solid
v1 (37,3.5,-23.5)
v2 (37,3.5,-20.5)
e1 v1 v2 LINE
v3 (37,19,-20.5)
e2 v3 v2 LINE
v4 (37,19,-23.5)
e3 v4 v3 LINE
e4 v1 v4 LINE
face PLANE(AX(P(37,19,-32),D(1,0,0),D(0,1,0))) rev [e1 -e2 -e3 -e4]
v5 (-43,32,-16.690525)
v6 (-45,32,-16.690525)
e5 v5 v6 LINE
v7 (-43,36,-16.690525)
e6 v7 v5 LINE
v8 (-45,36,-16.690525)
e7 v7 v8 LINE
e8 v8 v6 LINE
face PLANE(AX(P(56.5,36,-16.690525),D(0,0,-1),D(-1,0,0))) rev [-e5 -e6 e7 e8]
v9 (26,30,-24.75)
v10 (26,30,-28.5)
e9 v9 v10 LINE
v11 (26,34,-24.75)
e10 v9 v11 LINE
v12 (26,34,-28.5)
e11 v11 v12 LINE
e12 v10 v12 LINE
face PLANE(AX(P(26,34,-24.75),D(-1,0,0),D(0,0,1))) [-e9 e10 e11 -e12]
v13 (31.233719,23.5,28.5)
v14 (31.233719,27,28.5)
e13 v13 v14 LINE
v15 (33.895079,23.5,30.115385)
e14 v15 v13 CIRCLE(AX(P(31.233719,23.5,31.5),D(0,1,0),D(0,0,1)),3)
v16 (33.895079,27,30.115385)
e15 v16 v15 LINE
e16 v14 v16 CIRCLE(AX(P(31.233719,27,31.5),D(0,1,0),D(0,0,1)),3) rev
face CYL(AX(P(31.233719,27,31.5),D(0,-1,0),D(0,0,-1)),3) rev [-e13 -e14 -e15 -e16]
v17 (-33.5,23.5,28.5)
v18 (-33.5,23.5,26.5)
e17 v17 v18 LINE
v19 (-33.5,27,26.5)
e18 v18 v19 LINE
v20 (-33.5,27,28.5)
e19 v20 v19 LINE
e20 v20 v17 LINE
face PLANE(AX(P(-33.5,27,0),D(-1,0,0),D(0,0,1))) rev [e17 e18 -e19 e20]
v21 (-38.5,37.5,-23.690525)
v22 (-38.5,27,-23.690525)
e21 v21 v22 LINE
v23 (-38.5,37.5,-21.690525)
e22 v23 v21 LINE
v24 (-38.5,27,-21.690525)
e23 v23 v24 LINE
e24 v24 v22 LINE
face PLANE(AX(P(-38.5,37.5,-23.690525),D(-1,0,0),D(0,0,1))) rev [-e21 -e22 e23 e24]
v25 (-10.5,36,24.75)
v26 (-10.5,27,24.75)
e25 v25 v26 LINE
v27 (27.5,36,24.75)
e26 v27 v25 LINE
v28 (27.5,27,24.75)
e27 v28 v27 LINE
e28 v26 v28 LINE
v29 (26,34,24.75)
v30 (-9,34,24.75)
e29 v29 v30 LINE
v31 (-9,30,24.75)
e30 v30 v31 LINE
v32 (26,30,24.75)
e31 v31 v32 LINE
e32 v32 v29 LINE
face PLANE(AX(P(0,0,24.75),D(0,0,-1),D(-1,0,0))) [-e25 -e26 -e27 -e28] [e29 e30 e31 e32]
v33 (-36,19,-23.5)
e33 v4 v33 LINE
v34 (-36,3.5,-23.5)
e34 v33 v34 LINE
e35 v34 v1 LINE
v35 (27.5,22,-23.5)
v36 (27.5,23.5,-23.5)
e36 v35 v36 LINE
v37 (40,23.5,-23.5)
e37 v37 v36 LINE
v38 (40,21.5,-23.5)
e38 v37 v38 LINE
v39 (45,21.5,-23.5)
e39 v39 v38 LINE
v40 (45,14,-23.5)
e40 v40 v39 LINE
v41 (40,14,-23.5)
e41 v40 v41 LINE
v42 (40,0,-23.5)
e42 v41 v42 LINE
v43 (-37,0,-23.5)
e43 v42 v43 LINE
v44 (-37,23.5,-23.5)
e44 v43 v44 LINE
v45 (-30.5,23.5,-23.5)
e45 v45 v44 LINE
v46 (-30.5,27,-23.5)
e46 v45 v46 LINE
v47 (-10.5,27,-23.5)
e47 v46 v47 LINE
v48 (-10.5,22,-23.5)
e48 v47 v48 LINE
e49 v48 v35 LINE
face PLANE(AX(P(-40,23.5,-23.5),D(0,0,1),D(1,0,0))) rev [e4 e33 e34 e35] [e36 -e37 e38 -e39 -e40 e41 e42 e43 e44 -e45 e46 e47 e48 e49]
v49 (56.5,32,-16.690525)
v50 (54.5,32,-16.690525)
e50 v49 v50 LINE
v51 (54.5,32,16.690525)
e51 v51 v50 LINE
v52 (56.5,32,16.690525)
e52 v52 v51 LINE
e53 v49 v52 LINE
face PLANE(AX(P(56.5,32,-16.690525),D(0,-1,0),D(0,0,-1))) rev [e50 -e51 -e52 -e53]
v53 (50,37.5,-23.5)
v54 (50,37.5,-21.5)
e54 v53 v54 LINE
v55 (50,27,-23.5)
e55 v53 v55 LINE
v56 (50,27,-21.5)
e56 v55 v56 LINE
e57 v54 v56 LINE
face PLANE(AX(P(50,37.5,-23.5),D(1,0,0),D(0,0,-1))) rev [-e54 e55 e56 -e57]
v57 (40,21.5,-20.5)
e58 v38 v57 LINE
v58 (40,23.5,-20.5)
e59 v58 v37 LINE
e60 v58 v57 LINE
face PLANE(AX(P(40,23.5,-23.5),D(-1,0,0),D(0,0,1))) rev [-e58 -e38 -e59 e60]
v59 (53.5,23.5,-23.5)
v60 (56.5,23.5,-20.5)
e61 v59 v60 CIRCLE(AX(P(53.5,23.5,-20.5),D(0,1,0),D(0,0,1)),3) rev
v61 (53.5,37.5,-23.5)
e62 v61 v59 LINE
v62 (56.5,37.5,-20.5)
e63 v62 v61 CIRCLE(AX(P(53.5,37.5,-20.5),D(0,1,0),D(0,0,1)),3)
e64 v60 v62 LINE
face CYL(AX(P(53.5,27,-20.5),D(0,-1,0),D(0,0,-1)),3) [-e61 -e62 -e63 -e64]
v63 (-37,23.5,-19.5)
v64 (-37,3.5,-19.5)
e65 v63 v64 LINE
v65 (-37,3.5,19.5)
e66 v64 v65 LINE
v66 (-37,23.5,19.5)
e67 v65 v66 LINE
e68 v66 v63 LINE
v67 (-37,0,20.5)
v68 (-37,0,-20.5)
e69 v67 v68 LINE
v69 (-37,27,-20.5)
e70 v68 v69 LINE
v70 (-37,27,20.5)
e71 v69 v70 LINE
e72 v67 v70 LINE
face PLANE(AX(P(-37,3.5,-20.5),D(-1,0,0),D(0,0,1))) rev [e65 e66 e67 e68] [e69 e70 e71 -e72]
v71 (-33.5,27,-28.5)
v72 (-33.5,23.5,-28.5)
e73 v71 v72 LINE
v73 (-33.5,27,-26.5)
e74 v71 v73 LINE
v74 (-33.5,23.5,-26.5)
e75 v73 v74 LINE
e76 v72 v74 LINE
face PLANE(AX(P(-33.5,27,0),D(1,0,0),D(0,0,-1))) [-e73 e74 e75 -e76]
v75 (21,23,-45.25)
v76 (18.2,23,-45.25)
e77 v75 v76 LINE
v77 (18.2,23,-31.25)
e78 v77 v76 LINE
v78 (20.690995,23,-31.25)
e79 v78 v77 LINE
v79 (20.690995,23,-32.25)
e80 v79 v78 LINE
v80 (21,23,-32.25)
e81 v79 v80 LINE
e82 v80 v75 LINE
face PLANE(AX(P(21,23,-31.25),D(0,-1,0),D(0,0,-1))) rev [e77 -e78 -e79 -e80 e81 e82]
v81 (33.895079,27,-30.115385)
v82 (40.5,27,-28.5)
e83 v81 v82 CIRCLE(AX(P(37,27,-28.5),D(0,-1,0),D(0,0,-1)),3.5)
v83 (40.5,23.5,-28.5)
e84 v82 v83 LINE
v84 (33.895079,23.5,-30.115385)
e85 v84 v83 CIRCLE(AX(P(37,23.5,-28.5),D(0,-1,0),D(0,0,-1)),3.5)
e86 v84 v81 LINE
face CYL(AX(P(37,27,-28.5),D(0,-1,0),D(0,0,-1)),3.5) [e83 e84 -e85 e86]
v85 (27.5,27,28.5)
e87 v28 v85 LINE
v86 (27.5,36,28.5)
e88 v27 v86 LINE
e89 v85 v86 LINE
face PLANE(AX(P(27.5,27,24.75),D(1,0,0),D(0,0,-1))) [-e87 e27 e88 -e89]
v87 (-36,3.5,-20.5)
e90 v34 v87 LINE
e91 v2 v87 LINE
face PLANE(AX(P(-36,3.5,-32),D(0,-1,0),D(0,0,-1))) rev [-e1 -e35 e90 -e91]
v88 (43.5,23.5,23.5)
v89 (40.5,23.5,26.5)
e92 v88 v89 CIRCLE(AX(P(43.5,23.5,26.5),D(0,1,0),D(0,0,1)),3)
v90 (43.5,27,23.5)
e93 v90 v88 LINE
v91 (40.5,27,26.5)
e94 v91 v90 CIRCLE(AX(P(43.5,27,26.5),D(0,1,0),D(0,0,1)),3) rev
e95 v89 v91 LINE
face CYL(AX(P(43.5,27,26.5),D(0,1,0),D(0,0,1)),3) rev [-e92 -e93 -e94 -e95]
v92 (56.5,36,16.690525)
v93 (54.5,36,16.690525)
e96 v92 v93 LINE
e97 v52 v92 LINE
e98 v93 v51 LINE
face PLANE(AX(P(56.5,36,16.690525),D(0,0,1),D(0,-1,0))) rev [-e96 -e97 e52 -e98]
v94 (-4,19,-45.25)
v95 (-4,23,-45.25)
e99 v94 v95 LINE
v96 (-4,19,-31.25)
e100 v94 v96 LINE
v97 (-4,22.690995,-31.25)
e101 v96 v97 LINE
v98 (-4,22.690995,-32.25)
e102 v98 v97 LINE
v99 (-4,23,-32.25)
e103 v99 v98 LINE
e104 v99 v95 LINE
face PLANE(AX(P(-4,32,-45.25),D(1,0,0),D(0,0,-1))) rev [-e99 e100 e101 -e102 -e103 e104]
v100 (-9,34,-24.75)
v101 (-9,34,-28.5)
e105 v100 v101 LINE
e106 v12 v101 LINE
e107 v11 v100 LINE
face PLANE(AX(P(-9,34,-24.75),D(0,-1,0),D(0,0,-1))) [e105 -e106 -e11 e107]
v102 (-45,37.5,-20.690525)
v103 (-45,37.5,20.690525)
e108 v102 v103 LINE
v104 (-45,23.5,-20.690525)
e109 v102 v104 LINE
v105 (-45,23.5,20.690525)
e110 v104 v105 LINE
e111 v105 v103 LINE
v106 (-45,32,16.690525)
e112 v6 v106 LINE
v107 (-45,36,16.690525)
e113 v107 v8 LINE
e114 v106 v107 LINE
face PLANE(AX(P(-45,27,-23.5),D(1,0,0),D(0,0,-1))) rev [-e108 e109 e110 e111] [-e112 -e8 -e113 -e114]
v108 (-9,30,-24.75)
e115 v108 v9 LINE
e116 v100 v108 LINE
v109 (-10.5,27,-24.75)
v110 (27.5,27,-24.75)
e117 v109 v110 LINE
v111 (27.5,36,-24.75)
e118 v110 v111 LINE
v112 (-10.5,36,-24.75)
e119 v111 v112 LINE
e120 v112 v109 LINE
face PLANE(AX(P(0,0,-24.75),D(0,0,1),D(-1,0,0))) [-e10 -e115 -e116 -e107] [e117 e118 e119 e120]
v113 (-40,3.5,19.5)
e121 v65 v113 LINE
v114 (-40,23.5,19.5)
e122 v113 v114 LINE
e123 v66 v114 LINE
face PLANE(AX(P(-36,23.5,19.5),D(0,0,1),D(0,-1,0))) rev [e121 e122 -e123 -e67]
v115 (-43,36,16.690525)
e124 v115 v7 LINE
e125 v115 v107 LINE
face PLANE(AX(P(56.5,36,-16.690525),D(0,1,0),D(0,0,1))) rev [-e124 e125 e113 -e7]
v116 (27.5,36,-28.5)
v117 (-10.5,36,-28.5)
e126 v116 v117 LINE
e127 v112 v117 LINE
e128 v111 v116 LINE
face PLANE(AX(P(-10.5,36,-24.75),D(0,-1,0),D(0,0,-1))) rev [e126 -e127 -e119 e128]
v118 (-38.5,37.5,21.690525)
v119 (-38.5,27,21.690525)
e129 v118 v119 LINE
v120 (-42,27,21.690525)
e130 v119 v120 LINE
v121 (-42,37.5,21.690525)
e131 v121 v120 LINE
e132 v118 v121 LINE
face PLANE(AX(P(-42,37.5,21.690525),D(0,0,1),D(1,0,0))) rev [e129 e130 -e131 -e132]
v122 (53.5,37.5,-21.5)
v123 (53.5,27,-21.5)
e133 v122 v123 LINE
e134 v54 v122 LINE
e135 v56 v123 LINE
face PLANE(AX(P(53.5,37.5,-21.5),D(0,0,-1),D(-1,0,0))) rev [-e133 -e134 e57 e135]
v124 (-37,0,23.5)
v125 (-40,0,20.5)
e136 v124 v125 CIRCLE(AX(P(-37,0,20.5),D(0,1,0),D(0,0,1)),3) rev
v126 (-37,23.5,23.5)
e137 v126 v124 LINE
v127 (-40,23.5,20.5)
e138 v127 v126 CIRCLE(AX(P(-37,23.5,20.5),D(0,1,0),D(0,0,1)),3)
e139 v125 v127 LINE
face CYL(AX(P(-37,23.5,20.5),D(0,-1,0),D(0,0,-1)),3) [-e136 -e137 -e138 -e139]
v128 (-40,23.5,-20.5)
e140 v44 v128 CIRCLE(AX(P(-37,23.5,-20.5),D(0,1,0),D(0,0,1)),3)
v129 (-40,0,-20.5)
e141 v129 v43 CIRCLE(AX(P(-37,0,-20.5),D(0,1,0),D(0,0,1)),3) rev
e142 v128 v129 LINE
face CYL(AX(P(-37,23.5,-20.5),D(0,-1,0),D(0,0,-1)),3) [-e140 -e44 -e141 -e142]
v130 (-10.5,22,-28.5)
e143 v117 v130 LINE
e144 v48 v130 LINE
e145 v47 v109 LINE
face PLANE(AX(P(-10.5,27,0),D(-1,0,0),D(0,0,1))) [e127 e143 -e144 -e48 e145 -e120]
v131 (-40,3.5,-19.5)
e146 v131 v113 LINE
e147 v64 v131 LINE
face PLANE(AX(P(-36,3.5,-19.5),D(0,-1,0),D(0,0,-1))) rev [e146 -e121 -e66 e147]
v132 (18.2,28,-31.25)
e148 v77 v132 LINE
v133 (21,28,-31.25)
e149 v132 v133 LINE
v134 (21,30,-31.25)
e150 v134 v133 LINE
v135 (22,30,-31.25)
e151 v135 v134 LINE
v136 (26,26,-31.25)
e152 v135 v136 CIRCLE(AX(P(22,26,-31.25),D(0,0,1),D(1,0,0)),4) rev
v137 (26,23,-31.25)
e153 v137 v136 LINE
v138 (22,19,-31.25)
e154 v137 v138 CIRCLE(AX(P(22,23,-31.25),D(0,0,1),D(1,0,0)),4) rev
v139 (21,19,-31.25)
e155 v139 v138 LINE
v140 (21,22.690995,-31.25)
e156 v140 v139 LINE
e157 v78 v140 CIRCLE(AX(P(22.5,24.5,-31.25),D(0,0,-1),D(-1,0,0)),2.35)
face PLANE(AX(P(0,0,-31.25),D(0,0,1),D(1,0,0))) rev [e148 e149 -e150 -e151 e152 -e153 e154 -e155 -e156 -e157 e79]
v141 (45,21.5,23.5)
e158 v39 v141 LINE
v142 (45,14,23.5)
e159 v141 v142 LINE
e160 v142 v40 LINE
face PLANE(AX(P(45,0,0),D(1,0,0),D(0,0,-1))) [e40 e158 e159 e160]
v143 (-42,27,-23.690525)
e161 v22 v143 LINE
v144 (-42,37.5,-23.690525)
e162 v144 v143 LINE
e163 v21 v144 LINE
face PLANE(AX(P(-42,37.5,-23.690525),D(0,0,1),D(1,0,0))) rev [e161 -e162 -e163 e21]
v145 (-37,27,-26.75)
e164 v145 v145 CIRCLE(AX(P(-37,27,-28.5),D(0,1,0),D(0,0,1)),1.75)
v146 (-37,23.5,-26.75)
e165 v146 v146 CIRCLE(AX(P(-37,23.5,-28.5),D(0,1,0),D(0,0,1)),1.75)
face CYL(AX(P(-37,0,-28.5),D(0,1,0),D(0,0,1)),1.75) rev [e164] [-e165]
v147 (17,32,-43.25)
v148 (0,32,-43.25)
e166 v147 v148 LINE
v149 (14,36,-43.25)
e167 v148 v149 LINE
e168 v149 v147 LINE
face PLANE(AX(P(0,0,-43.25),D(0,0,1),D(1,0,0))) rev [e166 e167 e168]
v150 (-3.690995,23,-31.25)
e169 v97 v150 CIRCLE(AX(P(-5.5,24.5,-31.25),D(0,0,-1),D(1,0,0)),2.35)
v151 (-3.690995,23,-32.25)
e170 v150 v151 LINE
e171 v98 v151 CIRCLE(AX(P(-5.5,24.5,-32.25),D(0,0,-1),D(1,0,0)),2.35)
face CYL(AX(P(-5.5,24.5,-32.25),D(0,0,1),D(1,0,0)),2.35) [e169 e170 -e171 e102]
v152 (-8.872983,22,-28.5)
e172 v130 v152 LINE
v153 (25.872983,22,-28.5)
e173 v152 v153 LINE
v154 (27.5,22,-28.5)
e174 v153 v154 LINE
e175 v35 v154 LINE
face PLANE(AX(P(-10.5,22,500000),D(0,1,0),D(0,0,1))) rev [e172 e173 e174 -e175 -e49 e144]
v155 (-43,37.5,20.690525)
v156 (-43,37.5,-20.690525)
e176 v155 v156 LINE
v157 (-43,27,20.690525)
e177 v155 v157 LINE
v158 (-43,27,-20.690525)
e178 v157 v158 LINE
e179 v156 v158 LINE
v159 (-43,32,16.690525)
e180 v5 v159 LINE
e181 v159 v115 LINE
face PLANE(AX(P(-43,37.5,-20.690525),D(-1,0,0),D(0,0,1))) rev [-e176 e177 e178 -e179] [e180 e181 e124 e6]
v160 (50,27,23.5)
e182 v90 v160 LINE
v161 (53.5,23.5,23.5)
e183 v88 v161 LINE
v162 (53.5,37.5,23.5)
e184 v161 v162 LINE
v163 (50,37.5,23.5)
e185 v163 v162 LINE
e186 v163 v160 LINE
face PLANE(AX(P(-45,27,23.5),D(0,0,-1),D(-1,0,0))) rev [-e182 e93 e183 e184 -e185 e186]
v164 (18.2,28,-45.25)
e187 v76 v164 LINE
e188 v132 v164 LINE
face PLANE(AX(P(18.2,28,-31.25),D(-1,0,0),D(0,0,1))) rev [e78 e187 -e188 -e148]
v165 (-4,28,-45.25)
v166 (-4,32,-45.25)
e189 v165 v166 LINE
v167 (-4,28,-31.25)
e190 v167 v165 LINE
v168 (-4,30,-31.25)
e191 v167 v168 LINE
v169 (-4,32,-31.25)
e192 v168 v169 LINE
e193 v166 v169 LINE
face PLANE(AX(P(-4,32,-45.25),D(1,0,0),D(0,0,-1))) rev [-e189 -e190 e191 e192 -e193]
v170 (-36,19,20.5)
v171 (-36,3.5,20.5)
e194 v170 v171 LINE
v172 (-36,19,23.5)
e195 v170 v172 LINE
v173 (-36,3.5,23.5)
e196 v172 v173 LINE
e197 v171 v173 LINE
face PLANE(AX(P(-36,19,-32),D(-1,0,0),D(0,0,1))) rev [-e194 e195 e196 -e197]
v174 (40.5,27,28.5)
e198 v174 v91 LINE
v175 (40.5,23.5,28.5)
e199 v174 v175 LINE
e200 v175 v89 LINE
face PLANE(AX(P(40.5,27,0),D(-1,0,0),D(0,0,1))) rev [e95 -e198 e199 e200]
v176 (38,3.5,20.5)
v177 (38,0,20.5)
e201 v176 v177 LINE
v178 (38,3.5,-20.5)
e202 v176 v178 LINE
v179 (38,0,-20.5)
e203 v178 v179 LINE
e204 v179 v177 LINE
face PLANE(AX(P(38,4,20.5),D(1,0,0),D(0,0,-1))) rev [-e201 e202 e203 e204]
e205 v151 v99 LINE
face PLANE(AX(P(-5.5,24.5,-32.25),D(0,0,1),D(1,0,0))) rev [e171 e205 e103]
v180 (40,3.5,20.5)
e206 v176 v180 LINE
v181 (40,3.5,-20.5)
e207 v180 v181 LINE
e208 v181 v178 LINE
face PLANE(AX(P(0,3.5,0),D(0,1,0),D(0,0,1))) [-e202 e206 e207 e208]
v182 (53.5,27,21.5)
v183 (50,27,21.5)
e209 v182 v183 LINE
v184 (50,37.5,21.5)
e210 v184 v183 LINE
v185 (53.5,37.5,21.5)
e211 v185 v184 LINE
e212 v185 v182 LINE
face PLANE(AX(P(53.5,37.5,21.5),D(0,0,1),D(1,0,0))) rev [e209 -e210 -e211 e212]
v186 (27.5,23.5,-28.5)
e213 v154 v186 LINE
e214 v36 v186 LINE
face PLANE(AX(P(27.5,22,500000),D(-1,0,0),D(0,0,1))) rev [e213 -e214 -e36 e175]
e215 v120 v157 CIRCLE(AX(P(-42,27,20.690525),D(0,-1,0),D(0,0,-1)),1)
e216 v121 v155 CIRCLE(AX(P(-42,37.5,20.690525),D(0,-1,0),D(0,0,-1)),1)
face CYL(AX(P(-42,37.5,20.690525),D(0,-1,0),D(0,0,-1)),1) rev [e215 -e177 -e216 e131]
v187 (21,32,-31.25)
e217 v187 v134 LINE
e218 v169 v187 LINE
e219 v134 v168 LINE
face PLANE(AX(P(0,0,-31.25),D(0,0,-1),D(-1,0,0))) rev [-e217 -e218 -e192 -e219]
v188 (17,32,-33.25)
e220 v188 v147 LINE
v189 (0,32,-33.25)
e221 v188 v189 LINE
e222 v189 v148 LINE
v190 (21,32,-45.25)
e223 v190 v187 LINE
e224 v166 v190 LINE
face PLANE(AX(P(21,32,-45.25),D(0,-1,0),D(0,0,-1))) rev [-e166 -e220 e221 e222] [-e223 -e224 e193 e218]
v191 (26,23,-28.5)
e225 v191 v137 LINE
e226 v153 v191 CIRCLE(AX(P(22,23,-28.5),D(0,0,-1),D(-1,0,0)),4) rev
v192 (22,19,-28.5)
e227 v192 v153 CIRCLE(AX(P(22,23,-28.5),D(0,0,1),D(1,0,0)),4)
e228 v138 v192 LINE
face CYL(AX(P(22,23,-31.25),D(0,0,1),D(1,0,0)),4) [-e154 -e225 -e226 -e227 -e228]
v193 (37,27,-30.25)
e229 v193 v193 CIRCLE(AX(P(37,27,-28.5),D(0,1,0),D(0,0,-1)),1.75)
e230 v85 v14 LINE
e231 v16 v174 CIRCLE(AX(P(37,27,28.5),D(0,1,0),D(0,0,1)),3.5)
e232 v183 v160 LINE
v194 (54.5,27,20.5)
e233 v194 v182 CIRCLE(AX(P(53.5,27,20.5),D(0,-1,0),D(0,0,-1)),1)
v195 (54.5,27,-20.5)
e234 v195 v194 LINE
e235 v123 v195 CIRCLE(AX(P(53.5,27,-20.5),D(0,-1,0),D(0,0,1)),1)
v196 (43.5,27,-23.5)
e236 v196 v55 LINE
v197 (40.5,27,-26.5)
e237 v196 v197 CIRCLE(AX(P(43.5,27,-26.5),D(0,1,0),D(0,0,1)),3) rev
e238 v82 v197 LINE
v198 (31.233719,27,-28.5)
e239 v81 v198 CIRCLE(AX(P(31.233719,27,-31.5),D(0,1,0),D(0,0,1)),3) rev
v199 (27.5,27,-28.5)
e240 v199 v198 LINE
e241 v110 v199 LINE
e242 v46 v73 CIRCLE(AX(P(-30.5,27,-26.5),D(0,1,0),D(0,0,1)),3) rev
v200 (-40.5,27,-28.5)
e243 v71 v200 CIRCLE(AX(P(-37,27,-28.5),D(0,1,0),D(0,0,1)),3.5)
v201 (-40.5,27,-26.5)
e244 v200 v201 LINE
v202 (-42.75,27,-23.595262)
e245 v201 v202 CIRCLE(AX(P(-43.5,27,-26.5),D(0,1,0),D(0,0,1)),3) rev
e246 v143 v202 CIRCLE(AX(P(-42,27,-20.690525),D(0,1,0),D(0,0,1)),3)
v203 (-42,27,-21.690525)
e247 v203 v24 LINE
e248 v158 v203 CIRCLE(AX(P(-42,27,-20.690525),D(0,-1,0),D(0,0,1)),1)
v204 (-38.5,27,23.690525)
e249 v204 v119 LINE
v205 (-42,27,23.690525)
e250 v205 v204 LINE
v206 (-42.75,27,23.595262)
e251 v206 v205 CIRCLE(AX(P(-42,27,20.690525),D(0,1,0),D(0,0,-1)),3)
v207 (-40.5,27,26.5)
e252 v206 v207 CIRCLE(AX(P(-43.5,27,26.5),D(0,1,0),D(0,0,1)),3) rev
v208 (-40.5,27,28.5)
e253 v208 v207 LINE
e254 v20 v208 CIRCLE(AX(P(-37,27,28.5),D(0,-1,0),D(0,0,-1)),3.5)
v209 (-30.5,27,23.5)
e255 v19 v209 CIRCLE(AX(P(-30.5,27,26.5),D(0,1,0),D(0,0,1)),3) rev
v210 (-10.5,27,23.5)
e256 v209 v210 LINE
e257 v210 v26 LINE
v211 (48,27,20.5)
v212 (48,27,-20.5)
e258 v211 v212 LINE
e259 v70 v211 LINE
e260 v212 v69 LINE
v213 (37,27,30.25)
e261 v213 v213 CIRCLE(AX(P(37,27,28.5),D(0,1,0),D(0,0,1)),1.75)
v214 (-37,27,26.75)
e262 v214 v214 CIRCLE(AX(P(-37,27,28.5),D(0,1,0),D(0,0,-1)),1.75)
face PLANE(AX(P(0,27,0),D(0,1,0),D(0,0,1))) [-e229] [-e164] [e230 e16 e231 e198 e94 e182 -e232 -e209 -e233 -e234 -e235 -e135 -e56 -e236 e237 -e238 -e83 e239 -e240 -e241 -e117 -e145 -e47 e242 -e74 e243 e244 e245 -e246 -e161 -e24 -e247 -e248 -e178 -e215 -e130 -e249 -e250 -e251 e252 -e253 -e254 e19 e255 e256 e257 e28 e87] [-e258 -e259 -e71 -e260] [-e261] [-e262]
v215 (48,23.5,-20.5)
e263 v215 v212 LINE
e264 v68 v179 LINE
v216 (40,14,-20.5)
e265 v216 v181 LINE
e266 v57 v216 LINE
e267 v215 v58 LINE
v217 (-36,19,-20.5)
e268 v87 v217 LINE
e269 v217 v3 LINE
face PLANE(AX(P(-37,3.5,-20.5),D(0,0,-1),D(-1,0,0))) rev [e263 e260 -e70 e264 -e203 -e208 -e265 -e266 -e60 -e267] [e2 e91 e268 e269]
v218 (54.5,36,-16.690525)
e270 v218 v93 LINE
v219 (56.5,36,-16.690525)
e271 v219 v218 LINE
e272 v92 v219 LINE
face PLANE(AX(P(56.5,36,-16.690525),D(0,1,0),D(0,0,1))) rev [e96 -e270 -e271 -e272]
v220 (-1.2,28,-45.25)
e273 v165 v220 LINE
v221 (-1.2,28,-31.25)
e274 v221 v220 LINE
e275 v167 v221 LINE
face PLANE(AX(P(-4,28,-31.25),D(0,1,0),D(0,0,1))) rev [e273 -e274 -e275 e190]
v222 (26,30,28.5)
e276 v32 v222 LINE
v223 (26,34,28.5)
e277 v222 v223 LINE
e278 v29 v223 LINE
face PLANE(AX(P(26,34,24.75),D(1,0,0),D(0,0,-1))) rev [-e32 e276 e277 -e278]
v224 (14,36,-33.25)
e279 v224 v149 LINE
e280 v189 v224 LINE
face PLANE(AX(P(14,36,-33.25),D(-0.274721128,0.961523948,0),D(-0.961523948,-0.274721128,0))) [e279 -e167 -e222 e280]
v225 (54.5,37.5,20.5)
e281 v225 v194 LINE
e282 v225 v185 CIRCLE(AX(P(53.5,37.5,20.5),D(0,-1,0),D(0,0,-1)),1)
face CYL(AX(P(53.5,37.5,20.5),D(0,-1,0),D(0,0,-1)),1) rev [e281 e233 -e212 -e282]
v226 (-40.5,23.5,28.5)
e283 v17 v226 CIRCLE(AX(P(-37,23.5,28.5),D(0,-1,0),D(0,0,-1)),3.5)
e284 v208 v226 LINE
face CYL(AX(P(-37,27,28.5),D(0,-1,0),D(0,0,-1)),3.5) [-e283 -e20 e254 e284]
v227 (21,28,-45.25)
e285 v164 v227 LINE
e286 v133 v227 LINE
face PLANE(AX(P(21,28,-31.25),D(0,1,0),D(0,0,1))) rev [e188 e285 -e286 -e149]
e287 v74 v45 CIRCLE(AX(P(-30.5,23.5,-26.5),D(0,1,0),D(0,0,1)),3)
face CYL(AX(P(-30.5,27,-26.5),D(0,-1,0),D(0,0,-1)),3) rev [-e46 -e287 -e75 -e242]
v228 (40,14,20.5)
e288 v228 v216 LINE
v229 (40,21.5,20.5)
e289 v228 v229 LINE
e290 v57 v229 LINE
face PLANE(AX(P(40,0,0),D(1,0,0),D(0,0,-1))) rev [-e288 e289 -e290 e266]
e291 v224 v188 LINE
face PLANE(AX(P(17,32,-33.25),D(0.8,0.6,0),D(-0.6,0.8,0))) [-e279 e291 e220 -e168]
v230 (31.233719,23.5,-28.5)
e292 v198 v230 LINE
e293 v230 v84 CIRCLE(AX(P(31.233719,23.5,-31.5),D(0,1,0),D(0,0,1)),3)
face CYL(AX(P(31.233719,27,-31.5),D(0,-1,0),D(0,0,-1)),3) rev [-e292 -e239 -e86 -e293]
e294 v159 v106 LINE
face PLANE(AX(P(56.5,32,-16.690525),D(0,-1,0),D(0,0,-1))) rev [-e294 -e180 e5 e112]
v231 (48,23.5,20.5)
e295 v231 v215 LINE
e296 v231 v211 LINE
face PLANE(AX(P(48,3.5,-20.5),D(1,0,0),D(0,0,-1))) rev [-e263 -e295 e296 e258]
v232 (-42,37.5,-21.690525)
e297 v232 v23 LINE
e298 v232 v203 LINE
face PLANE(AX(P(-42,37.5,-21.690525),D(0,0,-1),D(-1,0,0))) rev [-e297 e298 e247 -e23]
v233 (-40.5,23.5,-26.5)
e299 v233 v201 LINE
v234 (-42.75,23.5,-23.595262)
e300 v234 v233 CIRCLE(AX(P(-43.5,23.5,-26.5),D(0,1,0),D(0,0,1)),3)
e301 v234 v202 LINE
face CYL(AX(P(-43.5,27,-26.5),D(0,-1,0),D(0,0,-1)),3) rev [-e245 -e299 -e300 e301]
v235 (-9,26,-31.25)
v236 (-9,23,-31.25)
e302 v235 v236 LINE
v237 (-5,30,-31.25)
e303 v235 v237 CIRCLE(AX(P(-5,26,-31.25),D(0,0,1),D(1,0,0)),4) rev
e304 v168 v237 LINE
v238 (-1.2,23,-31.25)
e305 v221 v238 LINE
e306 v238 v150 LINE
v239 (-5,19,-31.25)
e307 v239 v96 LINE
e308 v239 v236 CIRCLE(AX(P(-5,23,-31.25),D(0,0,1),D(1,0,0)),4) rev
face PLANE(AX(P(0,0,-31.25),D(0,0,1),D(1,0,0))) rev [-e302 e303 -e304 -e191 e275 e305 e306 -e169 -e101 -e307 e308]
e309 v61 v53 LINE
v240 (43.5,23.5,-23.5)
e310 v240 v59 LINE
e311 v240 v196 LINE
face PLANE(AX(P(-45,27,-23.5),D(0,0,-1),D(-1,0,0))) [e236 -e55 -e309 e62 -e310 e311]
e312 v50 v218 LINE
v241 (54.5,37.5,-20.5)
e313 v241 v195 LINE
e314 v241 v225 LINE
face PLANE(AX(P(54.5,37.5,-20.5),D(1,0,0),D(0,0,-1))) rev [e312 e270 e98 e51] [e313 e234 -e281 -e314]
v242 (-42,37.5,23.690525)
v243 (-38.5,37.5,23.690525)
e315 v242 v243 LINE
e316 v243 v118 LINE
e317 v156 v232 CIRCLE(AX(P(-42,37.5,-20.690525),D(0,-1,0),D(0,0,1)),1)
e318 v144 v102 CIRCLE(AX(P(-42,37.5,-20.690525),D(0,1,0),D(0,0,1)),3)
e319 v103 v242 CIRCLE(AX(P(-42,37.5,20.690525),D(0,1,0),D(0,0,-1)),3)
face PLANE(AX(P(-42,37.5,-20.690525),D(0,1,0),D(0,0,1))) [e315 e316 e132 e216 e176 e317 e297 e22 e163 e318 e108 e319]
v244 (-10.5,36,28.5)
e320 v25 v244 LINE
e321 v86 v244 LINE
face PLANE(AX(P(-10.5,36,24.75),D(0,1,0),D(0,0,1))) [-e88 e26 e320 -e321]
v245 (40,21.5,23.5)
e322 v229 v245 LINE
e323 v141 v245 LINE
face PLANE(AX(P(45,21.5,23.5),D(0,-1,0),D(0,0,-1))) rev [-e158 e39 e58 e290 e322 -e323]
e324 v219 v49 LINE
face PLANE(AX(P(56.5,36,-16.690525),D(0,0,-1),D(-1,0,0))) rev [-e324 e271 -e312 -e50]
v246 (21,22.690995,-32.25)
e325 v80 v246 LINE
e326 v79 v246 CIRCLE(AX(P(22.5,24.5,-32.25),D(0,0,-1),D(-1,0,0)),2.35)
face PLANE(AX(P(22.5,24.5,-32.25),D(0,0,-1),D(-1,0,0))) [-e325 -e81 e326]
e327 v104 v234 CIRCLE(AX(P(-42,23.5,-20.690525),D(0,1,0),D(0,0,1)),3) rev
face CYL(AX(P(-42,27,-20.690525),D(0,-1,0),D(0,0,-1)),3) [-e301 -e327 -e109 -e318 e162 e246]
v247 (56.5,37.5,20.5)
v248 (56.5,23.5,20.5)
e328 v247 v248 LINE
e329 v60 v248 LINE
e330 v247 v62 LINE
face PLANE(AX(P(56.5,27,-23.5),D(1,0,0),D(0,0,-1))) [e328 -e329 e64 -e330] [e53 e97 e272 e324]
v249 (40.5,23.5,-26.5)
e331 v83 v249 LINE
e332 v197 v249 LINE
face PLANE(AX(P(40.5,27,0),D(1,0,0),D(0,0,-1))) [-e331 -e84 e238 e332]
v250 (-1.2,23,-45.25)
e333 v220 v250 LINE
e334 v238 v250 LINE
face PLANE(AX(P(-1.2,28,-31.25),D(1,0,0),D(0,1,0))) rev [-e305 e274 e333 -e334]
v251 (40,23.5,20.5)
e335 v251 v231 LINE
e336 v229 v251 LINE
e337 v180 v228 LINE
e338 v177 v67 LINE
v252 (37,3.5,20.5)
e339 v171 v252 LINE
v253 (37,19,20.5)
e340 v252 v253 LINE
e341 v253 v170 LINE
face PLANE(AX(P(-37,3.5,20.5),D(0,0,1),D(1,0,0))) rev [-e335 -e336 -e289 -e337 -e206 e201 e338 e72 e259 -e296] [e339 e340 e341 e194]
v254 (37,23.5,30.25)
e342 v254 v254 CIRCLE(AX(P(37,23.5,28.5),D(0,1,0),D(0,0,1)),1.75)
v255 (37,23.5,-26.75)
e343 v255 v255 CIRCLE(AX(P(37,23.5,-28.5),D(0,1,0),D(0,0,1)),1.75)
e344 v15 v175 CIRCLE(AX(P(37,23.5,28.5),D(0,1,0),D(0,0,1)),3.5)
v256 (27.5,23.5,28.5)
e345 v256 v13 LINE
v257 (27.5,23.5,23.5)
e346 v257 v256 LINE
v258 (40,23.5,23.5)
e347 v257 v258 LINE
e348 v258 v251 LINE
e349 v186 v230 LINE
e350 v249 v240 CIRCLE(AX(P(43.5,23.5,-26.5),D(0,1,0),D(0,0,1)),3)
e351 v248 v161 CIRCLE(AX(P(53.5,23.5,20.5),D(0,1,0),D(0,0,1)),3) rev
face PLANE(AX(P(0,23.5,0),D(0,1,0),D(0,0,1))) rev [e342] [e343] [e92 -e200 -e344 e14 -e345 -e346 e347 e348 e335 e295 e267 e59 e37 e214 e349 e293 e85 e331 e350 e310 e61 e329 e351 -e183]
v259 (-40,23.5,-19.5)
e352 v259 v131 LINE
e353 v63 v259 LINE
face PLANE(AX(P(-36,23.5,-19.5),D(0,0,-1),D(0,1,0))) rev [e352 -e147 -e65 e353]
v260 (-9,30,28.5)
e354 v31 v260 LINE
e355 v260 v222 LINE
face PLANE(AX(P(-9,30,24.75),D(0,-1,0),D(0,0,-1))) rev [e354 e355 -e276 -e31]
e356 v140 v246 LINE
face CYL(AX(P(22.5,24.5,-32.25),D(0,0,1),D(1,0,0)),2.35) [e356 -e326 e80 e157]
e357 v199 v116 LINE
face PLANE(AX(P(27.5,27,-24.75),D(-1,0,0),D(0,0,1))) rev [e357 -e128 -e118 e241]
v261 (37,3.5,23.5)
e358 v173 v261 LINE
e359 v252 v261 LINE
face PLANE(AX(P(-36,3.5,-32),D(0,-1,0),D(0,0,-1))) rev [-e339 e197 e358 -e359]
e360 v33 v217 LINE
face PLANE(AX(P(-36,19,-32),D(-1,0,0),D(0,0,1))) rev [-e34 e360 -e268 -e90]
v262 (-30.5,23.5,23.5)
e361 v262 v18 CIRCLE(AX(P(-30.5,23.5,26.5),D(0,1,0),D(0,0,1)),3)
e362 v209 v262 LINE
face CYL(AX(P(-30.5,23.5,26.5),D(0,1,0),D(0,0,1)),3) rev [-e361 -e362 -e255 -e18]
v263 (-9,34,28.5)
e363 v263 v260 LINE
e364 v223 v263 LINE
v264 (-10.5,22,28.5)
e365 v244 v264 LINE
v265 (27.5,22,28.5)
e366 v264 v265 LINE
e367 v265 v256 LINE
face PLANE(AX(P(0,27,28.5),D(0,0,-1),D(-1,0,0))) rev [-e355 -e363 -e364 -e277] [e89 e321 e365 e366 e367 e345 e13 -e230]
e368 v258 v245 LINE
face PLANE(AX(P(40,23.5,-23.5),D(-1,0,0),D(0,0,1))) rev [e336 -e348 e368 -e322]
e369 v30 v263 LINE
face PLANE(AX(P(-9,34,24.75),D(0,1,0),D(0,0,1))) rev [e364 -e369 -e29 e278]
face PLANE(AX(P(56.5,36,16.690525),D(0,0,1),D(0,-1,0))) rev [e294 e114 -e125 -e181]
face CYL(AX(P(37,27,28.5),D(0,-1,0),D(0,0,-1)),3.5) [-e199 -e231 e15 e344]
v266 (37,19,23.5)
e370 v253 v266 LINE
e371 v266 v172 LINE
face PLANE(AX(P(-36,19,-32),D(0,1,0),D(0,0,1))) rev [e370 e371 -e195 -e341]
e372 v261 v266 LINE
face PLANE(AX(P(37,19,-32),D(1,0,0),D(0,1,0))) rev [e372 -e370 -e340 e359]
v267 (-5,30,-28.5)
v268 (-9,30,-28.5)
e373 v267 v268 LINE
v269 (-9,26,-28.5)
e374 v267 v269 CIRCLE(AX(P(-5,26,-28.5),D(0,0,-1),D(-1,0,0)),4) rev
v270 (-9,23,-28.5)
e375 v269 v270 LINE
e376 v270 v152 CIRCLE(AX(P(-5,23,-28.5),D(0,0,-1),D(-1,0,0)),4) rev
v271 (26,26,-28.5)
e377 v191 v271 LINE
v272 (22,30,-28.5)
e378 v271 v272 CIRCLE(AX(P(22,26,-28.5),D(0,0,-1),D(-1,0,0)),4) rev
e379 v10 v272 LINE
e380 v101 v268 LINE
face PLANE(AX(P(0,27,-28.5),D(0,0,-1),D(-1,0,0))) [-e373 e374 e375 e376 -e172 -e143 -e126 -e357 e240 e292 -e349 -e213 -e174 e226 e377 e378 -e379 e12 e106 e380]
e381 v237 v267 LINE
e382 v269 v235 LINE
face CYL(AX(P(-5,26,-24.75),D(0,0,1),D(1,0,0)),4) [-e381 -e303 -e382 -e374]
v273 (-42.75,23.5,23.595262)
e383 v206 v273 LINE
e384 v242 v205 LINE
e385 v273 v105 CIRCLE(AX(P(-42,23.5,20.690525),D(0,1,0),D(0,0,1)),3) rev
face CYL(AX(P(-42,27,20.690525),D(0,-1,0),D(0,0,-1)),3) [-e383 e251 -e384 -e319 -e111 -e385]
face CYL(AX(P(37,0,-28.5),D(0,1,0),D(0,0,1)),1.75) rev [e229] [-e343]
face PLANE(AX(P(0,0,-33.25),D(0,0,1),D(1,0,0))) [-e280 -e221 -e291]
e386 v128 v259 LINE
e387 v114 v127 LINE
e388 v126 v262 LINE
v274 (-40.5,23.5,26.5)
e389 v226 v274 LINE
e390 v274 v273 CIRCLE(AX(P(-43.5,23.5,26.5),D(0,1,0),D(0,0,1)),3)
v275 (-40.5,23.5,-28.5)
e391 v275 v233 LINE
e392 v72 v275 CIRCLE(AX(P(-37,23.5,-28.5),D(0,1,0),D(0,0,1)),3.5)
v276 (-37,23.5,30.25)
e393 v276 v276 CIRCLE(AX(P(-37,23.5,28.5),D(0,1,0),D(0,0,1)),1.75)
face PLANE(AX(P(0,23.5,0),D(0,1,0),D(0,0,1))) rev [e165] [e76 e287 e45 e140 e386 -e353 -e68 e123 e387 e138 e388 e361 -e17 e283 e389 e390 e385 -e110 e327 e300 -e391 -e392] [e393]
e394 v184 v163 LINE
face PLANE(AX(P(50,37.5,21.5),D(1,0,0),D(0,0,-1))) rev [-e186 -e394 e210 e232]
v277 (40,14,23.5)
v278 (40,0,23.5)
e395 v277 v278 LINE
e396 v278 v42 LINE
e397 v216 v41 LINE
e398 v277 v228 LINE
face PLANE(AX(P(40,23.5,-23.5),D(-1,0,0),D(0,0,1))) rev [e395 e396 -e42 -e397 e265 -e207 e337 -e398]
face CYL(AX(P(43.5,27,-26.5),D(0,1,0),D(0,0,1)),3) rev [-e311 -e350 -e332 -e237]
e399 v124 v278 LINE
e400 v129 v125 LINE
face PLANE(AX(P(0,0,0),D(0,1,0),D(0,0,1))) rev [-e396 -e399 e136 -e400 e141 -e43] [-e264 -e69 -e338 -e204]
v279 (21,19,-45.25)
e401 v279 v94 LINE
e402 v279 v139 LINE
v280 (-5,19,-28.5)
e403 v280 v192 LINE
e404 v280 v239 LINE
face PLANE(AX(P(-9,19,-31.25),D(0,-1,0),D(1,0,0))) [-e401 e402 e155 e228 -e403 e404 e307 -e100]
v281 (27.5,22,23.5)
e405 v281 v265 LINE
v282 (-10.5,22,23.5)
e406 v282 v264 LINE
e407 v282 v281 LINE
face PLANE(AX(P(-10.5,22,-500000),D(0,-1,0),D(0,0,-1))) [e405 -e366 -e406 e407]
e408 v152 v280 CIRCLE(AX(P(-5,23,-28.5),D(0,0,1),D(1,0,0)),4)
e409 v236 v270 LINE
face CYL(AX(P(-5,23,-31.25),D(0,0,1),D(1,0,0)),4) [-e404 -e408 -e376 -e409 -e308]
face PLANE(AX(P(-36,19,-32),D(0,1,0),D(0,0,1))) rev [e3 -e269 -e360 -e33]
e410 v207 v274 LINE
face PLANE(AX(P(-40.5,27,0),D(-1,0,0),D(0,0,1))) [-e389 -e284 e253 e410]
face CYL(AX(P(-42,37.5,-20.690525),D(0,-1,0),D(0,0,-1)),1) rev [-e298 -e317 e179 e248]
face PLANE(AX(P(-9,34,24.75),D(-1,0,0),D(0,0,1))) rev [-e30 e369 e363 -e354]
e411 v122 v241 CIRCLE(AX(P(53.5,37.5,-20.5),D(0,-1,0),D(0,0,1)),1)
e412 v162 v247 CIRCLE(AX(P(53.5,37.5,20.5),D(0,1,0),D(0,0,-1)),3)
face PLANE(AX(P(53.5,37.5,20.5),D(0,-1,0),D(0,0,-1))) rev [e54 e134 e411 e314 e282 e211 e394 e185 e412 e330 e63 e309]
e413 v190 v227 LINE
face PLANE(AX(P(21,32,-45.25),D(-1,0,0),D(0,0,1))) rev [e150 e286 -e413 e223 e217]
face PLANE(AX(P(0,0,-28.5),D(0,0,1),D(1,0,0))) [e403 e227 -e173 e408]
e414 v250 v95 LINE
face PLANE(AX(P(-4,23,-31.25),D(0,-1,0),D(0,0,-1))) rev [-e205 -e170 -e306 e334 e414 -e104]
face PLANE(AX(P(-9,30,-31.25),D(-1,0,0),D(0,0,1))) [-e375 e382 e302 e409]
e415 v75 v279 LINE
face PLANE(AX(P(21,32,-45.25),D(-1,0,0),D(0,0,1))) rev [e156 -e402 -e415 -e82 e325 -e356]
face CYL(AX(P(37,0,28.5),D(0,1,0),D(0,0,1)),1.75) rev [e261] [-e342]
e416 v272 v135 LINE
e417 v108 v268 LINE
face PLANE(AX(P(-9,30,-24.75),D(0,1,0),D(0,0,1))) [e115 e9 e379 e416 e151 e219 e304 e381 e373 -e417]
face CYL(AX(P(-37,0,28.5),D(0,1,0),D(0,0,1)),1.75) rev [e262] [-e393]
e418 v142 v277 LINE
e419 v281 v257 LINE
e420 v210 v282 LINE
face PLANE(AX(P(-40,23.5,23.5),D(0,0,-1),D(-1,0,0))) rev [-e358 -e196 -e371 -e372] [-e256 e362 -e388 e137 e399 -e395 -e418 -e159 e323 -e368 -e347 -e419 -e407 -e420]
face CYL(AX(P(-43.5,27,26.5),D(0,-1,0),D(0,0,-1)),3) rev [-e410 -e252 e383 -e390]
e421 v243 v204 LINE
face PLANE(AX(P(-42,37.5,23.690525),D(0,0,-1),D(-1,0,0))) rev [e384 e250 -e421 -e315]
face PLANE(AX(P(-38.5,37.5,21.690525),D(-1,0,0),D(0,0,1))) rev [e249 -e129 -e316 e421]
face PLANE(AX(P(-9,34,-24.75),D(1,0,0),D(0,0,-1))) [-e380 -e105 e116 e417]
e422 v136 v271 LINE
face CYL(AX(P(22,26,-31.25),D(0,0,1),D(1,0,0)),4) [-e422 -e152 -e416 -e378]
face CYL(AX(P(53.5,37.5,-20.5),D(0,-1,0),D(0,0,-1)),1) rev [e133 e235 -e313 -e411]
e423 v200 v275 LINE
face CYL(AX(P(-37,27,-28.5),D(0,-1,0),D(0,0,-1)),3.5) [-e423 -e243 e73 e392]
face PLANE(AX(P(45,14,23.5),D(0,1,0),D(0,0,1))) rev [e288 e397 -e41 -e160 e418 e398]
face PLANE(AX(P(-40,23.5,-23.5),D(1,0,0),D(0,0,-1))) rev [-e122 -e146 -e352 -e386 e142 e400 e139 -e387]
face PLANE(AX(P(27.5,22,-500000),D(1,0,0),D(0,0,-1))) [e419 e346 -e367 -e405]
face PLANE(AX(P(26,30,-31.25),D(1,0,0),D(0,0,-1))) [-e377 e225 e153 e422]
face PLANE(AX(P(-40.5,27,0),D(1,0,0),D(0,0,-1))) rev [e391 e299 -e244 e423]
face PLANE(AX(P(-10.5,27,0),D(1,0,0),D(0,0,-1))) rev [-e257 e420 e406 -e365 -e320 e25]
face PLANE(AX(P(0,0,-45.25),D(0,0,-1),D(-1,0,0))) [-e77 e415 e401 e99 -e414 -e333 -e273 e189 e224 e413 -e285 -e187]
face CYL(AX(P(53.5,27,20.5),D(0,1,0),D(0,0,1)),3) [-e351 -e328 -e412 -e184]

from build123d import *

# Parameters (mm, degrees)
SKETCH_1_W          = 80
SKETCH_1_H          = 47
EXTRUDE_1_DEPTH     = 23.5
EXTRUDE_2_DEPTH     = 3.5
SKETCH_19_R         = 1.75
CUT_EXTRUDE_7_DEPTH = 71.322471515
FILLET_2_R          = 3
SKETCH_3_W          = 85
SKETCH_3_H          = 41
CUT_EXTRUDE_1_DEPTH = 23.5
SKETCH_4_W          = 75
SKETCH_4_H          = 41
CUT_EXTRUDE_2_DEPTH = 4
SKETCH_5_W          = 73
SKETCH_5_H          = 15.5
CUT_EXTRUDE_3_DEPTH = 84.674966388
SKETCH_6_W          = 39
SKETCH_6_H          = 20
CUT_EXTRUDE_4_DEPTH = 4
EXTRUDE_3_REACH     = 89.072
SKETCH_9_W          = 38
SKETCH_9_H          = 5
SKETCH_10_W         = 38
SKETCH_10_H         = 9
EXTRUDE_4_DEPTH     = 3.75
SKETCH_11_W         = 35
SKETCH_11_H         = 4
CUT_EXTRUDE_5_DEPTH = 3.75
FILLET_3_R          = 3
FILLET_4_R          = 3
EXTRUDE_START       = 10.5
EXTRUDE_5_DEPTH     = 10.5
SKETCH_13_W         = 33.381049962
SKETCH_13_H         = 4
CUT_EXTRUDE_6_DEPTH = 113.838380057
SKETCH_14_W         = 47
SKETCH_14_H         = 7.5
EXTRUDE_6_DEPTH     = 5
SKETCH_15_W         = 35
SKETCH_15_H         = 11
EXTRUDE_7_DEPTH     = 2.75
SKETCH_16_W         = 25
SKETCH_16_H         = 13
EXTRUDE_8_DEPTH     = 14
SKETCH_21_W         = 2.8
SKETCH_21_H         = 5
CUT_EXTRUDE_8_DEPTH = 14
SKETCH_20_R         = 2.35
EXTRUDE_10_DEPTH    = 1
FILLET_5_R          = 4
EXTRUDE_START_2     = -2
EXTRUDE_9_DEPTH     = 10


with BuildPart() as part:
    # 草图1 → 凸台-拉伸1 (new body)
    with BuildSketch(Plane(origin=(0, 0, 0), x_dir=(1, 0, 0), z_dir=(0, 1, 0))):
        Rectangle(SKETCH_1_W, SKETCH_1_H)
    extrude(amount=EXTRUDE_1_DEPTH)

    # 草图2 → 凸台-拉伸2 (add)
    with BuildSketch(Plane(origin=(0, 23.5, 0), x_dir=(1, 0, 0), z_dir=(0, 1, 0))):
        with BuildLine():
            Line((-10.5, -28.5), (33.5, -28.5))
            ThreePointArc((33.5, -28.5), (37, -32), (40.5, -28.5))
            Line((40.5, -28.5), (40.5, -23.5))
            Line((40.5, -23.5), (56.5, -23.5))
            Line((56.5, -23.5), (56.5, 23.5))
            Line((56.5, 23.5), (40.5, 23.5))
            Line((40.5, 23.5), (40.5, 28.5))
            ThreePointArc((40.5, 28.5), (37, 32), (33.5, 28.5))
            Line((33.5, 28.5), (-10.5, 28.5))
            Line((-10.5, 28.5), (-10.5, 23.5))
            Line((-10.5, 23.5), (-33.5, 23.5))
            Line((-33.5, 23.5), (-33.5, 28.5))
            ThreePointArc((-33.5, 28.5), (-37, 32), (-40.5, 28.5))
            Line((-40.5, 28.5), (-40.5, 23.5))
            Line((-40.5, 23.5), (-45, 23.5))
            Line((-45, 23.5), (-45, -23.5))
            Line((-45, -23.5), (-40.5, -23.5))
            Line((-40.5, -23.5), (-40.5, -28.5))
            ThreePointArc((-40.5, -28.5), (-37, -32), (-33.5, -28.5))
            Line((-33.5, -28.5), (-33.5, -23.5))
            Line((-33.5, -23.5), (-10.5, -23.5))
            Line((-10.5, -23.5), (-10.5, -28.5))
        make_face()
    extrude(amount=EXTRUDE_2_DEPTH)

    # 草图19 → 切除-拉伸7 (cut, through all)
    with BuildSketch(Plane(origin=(0, 27, 0), x_dir=(1, 0, 0), z_dir=(0, 1, 0))):
        with Locations(Location((-37, 28.5, 0), (0, 0, 270))):
            Circle(SKETCH_19_R)
        with Locations(Location((37, 28.5, 0), (0, 0, 270))):
            Circle(SKETCH_19_R)
        with Locations(Location((37, -28.5, 0), (0, 0, 270))):
            Circle(SKETCH_19_R)
        with Locations(Location((-37, -28.5, 0), (0, 0, 270))):
            Circle(SKETCH_19_R)
    extrude(amount=-CUT_EXTRUDE_7_DEPTH, mode=Mode.SUBTRACT)

    # 圆角2
    fillet_2_edges = [part.edges().sort_by_distance(p)[0] for p in [
        (-40, 11.75, -23.5),
        (-40, 11.75, 23.5),
    ]]
    fillet(fillet_2_edges, radius=FILLET_2_R)

    # 草图3 → 切除-拉伸1 (cut)
    with BuildSketch(Plane(origin=(0, 27, 0), x_dir=(1, 0, 0), z_dir=(0, 1, 0))):
        with Locations((5.5, 0)):
            Rectangle(SKETCH_3_W, SKETCH_3_H)
    extrude(amount=-CUT_EXTRUDE_1_DEPTH, mode=Mode.SUBTRACT)

    # 草图4 → 切除-拉伸2 (cut)
    with BuildSketch(Plane.XZ):
        with Locations((0.5, 0)):
            Rectangle(SKETCH_4_W, SKETCH_4_H)
    extrude(amount=-CUT_EXTRUDE_2_DEPTH, mode=Mode.SUBTRACT)

    # 草图5 → 切除-拉伸3 (cut, through all)
    with BuildSketch(Plane.XY.offset(23.5)):
        with Locations((0.5, 11.25)):
            Rectangle(SKETCH_5_W, SKETCH_5_H)
    extrude(amount=-CUT_EXTRUDE_3_DEPTH, mode=Mode.SUBTRACT)

    # 草图6 → 切除-拉伸4 (cut)
    with BuildSketch(Plane.ZY.offset(40)):
        with Locations((0, 13.5)):
            Rectangle(SKETCH_6_W, SKETCH_6_H)
    extrude(amount=-CUT_EXTRUDE_4_DEPTH, mode=Mode.SUBTRACT)

    # 草图9 → 凸台-拉伸3 (add, up to next)
    with BuildSketch(Plane.XY.offset(28.5), mode=Mode.PRIVATE) as extrude_3_sk1:
        with Locations((8.5, 24.5)):
            Rectangle(SKETCH_9_W, SKETCH_9_H)
    extrude_3_tool1 = extrude(extrude_3_sk1.sketch, amount=-EXTRUDE_3_REACH, mode=Mode.PRIVATE) - part.part
    extrude_3 = extrude_3_tool1.solids().sort_by_distance((8.5, 24.5, 28.5))[0]
    add(extrude_3)

    # 草图10 → 凸台-拉伸4 (add)
    with BuildSketch(Plane.XY.offset(28.5)):
        with Locations((8.5, 31.5)):
            Rectangle(SKETCH_10_W, SKETCH_10_H)
    extrude_4 = extrude(amount=-EXTRUDE_4_DEPTH)

    # 草图11 → 切除-拉伸5 (cut)
    with BuildSketch(Plane.XY.offset(28.5)):
        with Locations((8.5, 32)):
            Rectangle(SKETCH_11_W, SKETCH_11_H)
    cut_extrude_5 = extrude(amount=-CUT_EXTRUDE_5_DEPTH, mode=Mode.SUBTRACT)

    # 镜向1: 凸台-拉伸3, 凸台-拉伸4, 切除-拉伸5 across plane
    add(extrude_3.mirror(Plane.XY))
    add(extrude_4.mirror(Plane.XY))
    add(cut_extrude_5.mirror(Plane.XY), mode=Mode.SUBTRACT)

    # 圆角3
    fillet_3_edges = [part.edges().sort_by_distance(p)[0] for p in [
        (33.5, 25.25, 28.5),
        (-40.5, 25.25, 23.5),
        (40.5, 25.25, -23.5),
        (33.5, 25.25, -28.5),
        (-33.5, 25.25, -23.5),
        (-33.5, 25.25, 23.5),
        (40.5, 25.25, 23.5),
        (-40.5, 25.25, -23.5),
    ]]
    fillet(fillet_3_edges, radius=FILLET_3_R)

    # 圆角4
    fillet_4_edges = [part.edges().sort_by_distance(p)[0] for p in [
        (56.5, 25.25, 23.5),
        (56.5, 25.25, -23.5),
        (-45, 25.25, -23.5),
        (-45, 25.25, 23.5),
    ]]
    fillet(fillet_4_edges, radius=FILLET_4_R)

    # 草图12 → 凸台-拉伸5 (add)
    with BuildSketch(Plane(origin=(0, 27, 0), x_dir=(1, 0, 0), z_dir=(0, 1, 0)).offset(EXTRUDE_START)):
        with BuildLine():
            Line((-45, 20.690524981), (-45, -20.690524981))
            ThreePointArc((-45, -20.690524981), (-44.121320344, -22.811845324), (-42, -23.690524981))
            Line((-42, -23.690524981), (-38.5, -23.690524981))
            Line((-38.5, -23.690524981), (-38.5, -21.690524981))
            Line((-38.5, -21.690524981), (-42, -21.690524981))
            ThreePointArc((-42, -21.690524981), (-42.707106781, -21.397631762), (-43, -20.690524981))
            Line((-43, -20.690524981), (-43, 20.690524981))
            ThreePointArc((-43, 20.690524981), (-42.707106781, 21.397631762), (-42, 21.690524981))
            Line((-42, 21.690524981), (-38.5, 21.690524981))
            Line((-38.5, 21.690524981), (-38.5, 23.690524981))
            Line((-38.5, 23.690524981), (-42, 23.690524981))
            ThreePointArc((-42, 23.690524981), (-44.121320344, 22.811845324), (-45, 20.690524981))
        make_face()
        with BuildLine():
            Line((53.5, 23.5), (50, 23.5))
            Line((50, 23.5), (50, 21.5))
            Line((50, 21.5), (53.5, 21.5))
            ThreePointArc((53.5, 21.5), (54.207106781, 21.207106781), (54.5, 20.5))
            Line((54.5, 20.5), (54.5, -20.5))
            ThreePointArc((54.5, -20.5), (54.207106781, -21.207106781), (53.5, -21.5))
            Line((53.5, -21.5), (50, -21.5))
            Line((50, -21.5), (50, -23.5))
            Line((50, -23.5), (53.5, -23.5))
            ThreePointArc((53.5, -23.5), (55.621320344, -22.621320344), (56.5, -20.5))
            Line((56.5, -20.5), (56.5, 20.5))
            ThreePointArc((56.5, 20.5), (55.621320344, 22.621320344), (53.5, 23.5))
        make_face()
    extrude(amount=-EXTRUDE_5_DEPTH)

    # 草图13 → 切除-拉伸6 (cut, through all)
    with BuildSketch(Plane.ZY.offset(45)):
        with Locations((0, 34)):
            Rectangle(SKETCH_13_W, SKETCH_13_H)
    extrude(amount=-CUT_EXTRUDE_6_DEPTH, mode=Mode.SUBTRACT)

    # 草图14 → 凸台-拉伸6 (add)
    with BuildSketch(Plane(origin=(40, 0, 0), x_dir=(0, 0, -1), z_dir=(1, 0, 0))):
        with Locations((0, 17.75)):
            Rectangle(SKETCH_14_W, SKETCH_14_H)
    extrude(amount=EXTRUDE_6_DEPTH)

    # 草图15 → 凸台-拉伸7 (add)
    with BuildSketch(Plane.XY.offset(-28.5)):
        with Locations((8.5, 24.5)):
            Rectangle(SKETCH_15_W, SKETCH_15_H)
    extrude(amount=-EXTRUDE_7_DEPTH)

    # 草图16 → 凸台-拉伸8 (add)
    with BuildSketch(Plane(origin=(0, 0, -31.25), x_dir=(-1, 0, 0), z_dir=(0, 0, -1))):
        with Locations((-8.5, 25.5)):
            Rectangle(SKETCH_16_W, SKETCH_16_H)
    extrude(amount=EXTRUDE_8_DEPTH)

    # 草图21 → 切除-拉伸8 (cut)
    with BuildSketch(Plane(origin=(0, 0, -45.25), x_dir=(-1, 0, 0), z_dir=(0, 0, -1))):
        with Locations((-19.6, 25.5)):
            Rectangle(SKETCH_21_W, SKETCH_21_H)
        with Locations((2.6, 25.5)):
            Rectangle(SKETCH_21_W, SKETCH_21_H)
    extrude(amount=-CUT_EXTRUDE_8_DEPTH, mode=Mode.SUBTRACT)

    # 草图20 → 凸台-拉伸10 (add)
    with BuildSketch(Plane(origin=(0, 0, -31.25), x_dir=(-1, 0, 0), z_dir=(0, 0, -1))):
        with Locations((-22.5, 24.5)):
            Circle(SKETCH_20_R)
        with Locations((5.5, 24.5)):
            Circle(SKETCH_20_R)
    extrude(amount=EXTRUDE_10_DEPTH)

    # 圆角5
    # the kernel refuses this fillet: 4 mm, written as the material it takes off along each edge
    with BuildSketch(Plane(origin=(26, 19, -28.5), x_dir=(-1, 0, 0), z_dir=(0, 0, -1)), Plane(origin=(-9, 30, -28.5), x_dir=(1, 0, 0), z_dir=(0, 0, -1))) as fillet_5_piece_1:
        with BuildLine():
            CenterArc((FILLET_5_R, FILLET_5_R), FILLET_5_R, 180, 90)
            Line((0, FILLET_5_R), (0, 0))
            Line((0, 0), (FILLET_5_R, 0))
        make_face()
    extrude(amount=12.75, mode=Mode.SUBTRACT)
    with BuildSketch(Plane(origin=(26, 30, -28.5), x_dir=(-1, 0, 0), z_dir=(0, 0, -1)), Plane(origin=(-9, 19, -28.5), x_dir=(1, 0, 0), z_dir=(0, 0, -1))) as fillet_5_piece_2:
        with BuildLine():
            CenterArc((FILLET_5_R, -FILLET_5_R), FILLET_5_R, 90, 90)
            Line((0, -FILLET_5_R), (0, 0))
            Line((0, 0), (FILLET_5_R, 0))
        make_face()
    extrude(amount=12.75, mode=Mode.SUBTRACT)

    # 草图17 → 凸台-拉伸9 (add)
    with BuildSketch(Plane(origin=(0, 0, -45.25), x_dir=(-1, 0, 0), z_dir=(0, 0, -1)).offset(EXTRUDE_START_2)):
        Polygon((-17, 32), (-14, 36), (0, 32), align=None)
    extrude(amount=-EXTRUDE_9_DEPTH)


solid = part.part
